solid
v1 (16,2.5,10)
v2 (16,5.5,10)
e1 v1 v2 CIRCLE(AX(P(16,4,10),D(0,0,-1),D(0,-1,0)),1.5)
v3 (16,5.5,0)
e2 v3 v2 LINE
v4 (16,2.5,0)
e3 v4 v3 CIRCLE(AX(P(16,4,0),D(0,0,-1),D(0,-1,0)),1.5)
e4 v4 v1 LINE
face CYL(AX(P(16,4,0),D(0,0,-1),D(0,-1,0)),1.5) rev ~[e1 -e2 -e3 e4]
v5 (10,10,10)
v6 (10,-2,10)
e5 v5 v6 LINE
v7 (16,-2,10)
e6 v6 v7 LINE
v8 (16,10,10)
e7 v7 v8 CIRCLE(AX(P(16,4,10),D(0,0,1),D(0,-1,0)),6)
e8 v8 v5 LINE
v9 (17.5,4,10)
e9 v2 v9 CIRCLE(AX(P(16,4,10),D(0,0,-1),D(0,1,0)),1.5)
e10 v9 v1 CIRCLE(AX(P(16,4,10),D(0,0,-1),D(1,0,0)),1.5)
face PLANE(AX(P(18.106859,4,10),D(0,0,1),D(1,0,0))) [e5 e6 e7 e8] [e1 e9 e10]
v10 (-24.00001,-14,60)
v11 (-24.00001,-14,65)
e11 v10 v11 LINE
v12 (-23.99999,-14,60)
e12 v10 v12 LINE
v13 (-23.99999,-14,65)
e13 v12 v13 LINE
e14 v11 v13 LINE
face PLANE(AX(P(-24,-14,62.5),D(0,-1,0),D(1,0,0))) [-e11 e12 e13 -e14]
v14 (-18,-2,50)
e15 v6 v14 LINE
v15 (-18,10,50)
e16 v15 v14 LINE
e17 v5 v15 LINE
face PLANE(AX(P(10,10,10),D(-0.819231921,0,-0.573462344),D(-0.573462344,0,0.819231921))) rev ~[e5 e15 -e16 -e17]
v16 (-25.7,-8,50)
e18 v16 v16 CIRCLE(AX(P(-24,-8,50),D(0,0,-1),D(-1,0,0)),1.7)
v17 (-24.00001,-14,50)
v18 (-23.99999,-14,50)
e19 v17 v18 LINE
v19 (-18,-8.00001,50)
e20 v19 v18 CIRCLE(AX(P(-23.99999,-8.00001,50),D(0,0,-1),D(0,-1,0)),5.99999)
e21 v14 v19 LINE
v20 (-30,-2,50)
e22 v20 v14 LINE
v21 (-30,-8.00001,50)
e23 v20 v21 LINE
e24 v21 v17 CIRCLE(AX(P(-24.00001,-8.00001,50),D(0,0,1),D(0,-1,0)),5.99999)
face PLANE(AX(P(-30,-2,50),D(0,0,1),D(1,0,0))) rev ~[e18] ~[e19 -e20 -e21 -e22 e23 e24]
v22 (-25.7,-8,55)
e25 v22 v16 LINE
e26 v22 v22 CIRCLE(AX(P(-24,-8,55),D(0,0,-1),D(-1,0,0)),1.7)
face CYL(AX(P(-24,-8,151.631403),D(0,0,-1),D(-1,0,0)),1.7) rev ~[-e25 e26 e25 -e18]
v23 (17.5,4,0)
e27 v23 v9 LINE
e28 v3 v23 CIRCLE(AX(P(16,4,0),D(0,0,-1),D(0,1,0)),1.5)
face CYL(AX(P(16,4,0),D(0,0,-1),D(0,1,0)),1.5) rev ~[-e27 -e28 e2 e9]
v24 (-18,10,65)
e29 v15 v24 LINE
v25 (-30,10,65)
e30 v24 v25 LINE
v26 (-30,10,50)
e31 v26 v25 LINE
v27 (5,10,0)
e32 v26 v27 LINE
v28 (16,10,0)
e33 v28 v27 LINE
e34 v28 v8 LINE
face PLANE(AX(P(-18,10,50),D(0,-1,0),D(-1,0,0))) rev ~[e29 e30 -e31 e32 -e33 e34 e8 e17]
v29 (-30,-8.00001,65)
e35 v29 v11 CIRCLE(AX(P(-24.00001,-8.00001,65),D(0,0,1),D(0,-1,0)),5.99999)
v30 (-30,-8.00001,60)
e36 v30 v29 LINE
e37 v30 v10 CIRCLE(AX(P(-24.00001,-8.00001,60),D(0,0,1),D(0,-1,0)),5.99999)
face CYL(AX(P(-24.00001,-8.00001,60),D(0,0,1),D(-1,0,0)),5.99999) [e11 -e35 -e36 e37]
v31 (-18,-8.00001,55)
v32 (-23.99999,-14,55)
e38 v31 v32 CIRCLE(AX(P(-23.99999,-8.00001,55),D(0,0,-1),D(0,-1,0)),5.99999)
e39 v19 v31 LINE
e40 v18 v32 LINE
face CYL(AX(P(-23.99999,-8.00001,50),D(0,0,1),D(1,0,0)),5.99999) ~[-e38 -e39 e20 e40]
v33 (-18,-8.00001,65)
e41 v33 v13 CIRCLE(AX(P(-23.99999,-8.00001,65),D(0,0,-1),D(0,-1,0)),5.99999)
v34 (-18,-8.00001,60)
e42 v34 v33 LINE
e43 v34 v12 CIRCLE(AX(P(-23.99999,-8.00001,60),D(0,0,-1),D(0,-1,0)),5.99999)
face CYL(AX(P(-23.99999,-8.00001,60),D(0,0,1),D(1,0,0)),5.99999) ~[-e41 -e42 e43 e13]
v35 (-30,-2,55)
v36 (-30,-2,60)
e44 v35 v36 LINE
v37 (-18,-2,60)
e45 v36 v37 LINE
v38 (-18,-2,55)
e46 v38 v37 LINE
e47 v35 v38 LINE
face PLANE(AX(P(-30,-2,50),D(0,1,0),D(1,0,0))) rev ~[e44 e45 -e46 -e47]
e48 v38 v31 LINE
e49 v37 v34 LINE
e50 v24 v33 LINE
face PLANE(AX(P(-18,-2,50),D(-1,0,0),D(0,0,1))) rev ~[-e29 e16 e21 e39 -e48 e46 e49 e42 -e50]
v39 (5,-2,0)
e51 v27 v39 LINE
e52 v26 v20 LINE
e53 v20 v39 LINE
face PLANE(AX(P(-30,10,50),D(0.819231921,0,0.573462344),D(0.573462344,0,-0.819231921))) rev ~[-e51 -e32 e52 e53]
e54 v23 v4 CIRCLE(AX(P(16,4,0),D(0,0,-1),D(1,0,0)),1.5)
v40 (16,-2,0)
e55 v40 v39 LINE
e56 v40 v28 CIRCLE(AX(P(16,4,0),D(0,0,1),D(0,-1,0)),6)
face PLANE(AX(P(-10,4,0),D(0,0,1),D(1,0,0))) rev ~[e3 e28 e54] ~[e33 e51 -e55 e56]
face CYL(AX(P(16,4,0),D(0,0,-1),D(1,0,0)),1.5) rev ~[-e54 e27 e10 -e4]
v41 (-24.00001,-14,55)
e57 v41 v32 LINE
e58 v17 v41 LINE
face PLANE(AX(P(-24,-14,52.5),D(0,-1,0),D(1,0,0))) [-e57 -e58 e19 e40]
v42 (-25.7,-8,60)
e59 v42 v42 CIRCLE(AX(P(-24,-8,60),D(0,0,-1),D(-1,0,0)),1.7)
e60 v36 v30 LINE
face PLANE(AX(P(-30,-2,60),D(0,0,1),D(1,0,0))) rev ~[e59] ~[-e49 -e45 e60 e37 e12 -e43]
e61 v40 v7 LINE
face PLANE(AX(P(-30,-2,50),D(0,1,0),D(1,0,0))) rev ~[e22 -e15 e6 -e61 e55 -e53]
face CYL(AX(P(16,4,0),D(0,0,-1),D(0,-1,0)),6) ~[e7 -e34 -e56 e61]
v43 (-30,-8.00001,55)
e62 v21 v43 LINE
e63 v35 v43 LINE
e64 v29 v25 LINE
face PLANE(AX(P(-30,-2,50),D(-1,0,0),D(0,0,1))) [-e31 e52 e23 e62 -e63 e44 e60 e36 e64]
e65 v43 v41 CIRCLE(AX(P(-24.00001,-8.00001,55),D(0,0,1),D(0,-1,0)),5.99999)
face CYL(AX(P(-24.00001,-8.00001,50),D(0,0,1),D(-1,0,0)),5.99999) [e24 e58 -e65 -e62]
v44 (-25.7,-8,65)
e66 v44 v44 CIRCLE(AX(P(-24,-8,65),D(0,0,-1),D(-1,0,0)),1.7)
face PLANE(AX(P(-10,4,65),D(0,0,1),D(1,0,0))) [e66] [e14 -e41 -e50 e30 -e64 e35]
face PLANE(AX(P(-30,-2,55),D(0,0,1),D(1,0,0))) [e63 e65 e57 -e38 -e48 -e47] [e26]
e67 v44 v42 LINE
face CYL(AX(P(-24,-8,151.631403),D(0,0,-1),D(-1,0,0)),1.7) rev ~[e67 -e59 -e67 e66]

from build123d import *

# Parameters (mm, degrees)
F1_DEPTH  = 20
F2_START  = 10
F1_FACE_R = 1.5
F2_DEPTH  = 10
F3_DEPTH  = 50
F5_DEPTH  = 12.001
F6_DEPTH  = 15
F7_W      = 12
F7_H      = 5
F8_DEPTH  = 12
F9_R      = 5.99999
F11_D     = 3.4


# Not quite as in the source:
# - a fillet or chamfer is up to 0.001 mm smaller than in the source, because OpenCascade refuses the exact size
# - a feature names something its author has since deleted; it is built from what else it names


with BuildPart() as f1:
    # F0 (on Top) → F1 (new body)
    with BuildSketch(Plane.XY):
        with BuildLine():
            ThreePointArc((16, -2), (22, 4), (16, 10))
            Line((16, 10), (16, 5.5))
            ThreePointArc((16, 5.5), (17.0606601718, 5.0606601718), (17.5, 4))
            ThreePointArc((17.5, 4), (17.0606601718, 2.9393398282), (16, 2.5))
            Line((16, 2.5), (16, -2))
        make_face()
        with BuildLine():
            Line((16, 5.5), (16, 10))
            ThreePointArc((16, 10), (11.7573593129, 8.2426406871), (10, 4))
            ThreePointArc((10, 4), (11.7573593129, -0.2426406871), (16, -2))
            Line((16, -2), (16, 2.5))
            ThreePointArc((16, 2.5), (14.5, 4), (16, 5.5))
        make_face()
        with BuildLine():
            Line((16, 10), (10, 10))
            Line((10, 10), (10, 4))
            ThreePointArc((10, 4), (11.7573593129, 8.2426406871), (16, 10))
        make_face()
        with BuildLine():
            ThreePointArc((16, -2), (11.7573593129, -0.2426406871), (10, 4))
            Line((10, 4), (10, -2))
            Line((10, -2), (16, -2))
        make_face()
    extrude(amount=F1_DEPTH)

    # F0 (on Top) + F1_face (on face) → F2 (cut)
    with BuildSketch(Plane.XY.offset(F2_START)):
        with BuildLine():
            ThreePointArc((16, -2), (22, 4), (16, 10))
            Line((16, 10), (16, 5.5))
            ThreePointArc((16, 5.5), (17.0606601718, 5.0606601718), (17.5, 4))
            ThreePointArc((17.5, 4), (17.0606601718, 2.9393398282), (16, 2.5))
            Line((16, 2.5), (16, -2))
        make_face()
        with BuildLine():
            Line((16, 5.5), (16, 10))
            ThreePointArc((16, 10), (11.7573593129, 8.2426406871), (10, 4))
            ThreePointArc((10, 4), (11.7573593129, -0.2426406871), (16, -2))
            Line((16, -2), (16, 2.5))
            ThreePointArc((16, 2.5), (14.5, 4), (16, 5.5))
        make_face()
        with BuildLine():
            ThreePointArc((16, -2), (11.7573593129, -0.2426406871), (10, 4))
            Line((10, 4), (10, -2))
            Line((10, -2), (16, -2))
        make_face()
        with BuildLine():
            Line((16, 10), (10, 10))
            Line((10, 10), (10, 4))
            ThreePointArc((10, 4), (11.7573593129, 8.2426406871), (16, 10))
        make_face()
    with BuildSketch(Plane(origin=(15.4073102565, 4, 20), x_dir=(1, 0, 0), z_dir=(0, 0, 1)).offset(F2_START)):
        with BuildLine():
            ThreePointArc((0.5926897435, -6), (6.5926897435, 0), (0.5926897435, 6))
            Line((0.5926897435, 6), (-5.4073102565, 6))
            Line((-5.4073102565, 6), (-5.4073102565, -6))
            Line((-5.4073102565, -6), (0.5926897435, -6))
        make_face()
        with Locations((0.5926897435, 0)):
            Circle(F1_FACE_R, mode=Mode.SUBTRACT)
    extrude(amount=F2_DEPTH, mode=Mode.SUBTRACT)

    # F0 (on Top) → F3 (join)
    with BuildSketch(Plane.XY):
        Polygon((10, 4), (10, 10), (-30, 10), (-30, -2), (10, -2), align=None)
    extrude(amount=F3_DEPTH)

    # F4 (on face) → F5 (cut, through all)
    with BuildSketch(Plane(origin=(0, 10, 0), x_dir=(-1, 0, 0), z_dir=(0, 1, 0))):
        Polygon((-10, 50), (-10, 10), (18, 50), align=None)
        Polygon((30, 0), (30, 50), (-5, 0), align=None)
    extrude(amount=-F5_DEPTH, mode=Mode.SUBTRACT)

    # F6 (add): a face of the model
    f6_faces = [f1.faces().sort_by_distance(p)[0] for p in [
        (-24, 4, 50),
    ]]
    extrude(f6_faces, amount=F6_DEPTH)

    # F7 (on face) → F8 (join)
    with BuildSketch(Plane.XZ.offset(2)):
        with Locations((-24, 52.5)):
            Rectangle(F7_W, F7_H)
        with Locations((-24, 62.5)):
            Rectangle(F7_W, F7_H)
    extrude(amount=F8_DEPTH)

    # F9 (radius 6 in the source; OpenCascade refuses exactly that, so slightly less here)
    f9_edges = [f1.edges().sort_by_distance(p)[0] for p in [
        (-30, -14, 62.5),
        (-18, -14, 62.5),
        (-18, -14, 52.5),
        (-30, -14, 52.5),
    ]]
    fillet(f9_edges, radius=F9_R)

    # F11 (through all)
    with Locations(Plane.XY.offset(65)):
        with Locations((-24, -8)):
            Hole(F11_D / 2)


solid = f1.part
